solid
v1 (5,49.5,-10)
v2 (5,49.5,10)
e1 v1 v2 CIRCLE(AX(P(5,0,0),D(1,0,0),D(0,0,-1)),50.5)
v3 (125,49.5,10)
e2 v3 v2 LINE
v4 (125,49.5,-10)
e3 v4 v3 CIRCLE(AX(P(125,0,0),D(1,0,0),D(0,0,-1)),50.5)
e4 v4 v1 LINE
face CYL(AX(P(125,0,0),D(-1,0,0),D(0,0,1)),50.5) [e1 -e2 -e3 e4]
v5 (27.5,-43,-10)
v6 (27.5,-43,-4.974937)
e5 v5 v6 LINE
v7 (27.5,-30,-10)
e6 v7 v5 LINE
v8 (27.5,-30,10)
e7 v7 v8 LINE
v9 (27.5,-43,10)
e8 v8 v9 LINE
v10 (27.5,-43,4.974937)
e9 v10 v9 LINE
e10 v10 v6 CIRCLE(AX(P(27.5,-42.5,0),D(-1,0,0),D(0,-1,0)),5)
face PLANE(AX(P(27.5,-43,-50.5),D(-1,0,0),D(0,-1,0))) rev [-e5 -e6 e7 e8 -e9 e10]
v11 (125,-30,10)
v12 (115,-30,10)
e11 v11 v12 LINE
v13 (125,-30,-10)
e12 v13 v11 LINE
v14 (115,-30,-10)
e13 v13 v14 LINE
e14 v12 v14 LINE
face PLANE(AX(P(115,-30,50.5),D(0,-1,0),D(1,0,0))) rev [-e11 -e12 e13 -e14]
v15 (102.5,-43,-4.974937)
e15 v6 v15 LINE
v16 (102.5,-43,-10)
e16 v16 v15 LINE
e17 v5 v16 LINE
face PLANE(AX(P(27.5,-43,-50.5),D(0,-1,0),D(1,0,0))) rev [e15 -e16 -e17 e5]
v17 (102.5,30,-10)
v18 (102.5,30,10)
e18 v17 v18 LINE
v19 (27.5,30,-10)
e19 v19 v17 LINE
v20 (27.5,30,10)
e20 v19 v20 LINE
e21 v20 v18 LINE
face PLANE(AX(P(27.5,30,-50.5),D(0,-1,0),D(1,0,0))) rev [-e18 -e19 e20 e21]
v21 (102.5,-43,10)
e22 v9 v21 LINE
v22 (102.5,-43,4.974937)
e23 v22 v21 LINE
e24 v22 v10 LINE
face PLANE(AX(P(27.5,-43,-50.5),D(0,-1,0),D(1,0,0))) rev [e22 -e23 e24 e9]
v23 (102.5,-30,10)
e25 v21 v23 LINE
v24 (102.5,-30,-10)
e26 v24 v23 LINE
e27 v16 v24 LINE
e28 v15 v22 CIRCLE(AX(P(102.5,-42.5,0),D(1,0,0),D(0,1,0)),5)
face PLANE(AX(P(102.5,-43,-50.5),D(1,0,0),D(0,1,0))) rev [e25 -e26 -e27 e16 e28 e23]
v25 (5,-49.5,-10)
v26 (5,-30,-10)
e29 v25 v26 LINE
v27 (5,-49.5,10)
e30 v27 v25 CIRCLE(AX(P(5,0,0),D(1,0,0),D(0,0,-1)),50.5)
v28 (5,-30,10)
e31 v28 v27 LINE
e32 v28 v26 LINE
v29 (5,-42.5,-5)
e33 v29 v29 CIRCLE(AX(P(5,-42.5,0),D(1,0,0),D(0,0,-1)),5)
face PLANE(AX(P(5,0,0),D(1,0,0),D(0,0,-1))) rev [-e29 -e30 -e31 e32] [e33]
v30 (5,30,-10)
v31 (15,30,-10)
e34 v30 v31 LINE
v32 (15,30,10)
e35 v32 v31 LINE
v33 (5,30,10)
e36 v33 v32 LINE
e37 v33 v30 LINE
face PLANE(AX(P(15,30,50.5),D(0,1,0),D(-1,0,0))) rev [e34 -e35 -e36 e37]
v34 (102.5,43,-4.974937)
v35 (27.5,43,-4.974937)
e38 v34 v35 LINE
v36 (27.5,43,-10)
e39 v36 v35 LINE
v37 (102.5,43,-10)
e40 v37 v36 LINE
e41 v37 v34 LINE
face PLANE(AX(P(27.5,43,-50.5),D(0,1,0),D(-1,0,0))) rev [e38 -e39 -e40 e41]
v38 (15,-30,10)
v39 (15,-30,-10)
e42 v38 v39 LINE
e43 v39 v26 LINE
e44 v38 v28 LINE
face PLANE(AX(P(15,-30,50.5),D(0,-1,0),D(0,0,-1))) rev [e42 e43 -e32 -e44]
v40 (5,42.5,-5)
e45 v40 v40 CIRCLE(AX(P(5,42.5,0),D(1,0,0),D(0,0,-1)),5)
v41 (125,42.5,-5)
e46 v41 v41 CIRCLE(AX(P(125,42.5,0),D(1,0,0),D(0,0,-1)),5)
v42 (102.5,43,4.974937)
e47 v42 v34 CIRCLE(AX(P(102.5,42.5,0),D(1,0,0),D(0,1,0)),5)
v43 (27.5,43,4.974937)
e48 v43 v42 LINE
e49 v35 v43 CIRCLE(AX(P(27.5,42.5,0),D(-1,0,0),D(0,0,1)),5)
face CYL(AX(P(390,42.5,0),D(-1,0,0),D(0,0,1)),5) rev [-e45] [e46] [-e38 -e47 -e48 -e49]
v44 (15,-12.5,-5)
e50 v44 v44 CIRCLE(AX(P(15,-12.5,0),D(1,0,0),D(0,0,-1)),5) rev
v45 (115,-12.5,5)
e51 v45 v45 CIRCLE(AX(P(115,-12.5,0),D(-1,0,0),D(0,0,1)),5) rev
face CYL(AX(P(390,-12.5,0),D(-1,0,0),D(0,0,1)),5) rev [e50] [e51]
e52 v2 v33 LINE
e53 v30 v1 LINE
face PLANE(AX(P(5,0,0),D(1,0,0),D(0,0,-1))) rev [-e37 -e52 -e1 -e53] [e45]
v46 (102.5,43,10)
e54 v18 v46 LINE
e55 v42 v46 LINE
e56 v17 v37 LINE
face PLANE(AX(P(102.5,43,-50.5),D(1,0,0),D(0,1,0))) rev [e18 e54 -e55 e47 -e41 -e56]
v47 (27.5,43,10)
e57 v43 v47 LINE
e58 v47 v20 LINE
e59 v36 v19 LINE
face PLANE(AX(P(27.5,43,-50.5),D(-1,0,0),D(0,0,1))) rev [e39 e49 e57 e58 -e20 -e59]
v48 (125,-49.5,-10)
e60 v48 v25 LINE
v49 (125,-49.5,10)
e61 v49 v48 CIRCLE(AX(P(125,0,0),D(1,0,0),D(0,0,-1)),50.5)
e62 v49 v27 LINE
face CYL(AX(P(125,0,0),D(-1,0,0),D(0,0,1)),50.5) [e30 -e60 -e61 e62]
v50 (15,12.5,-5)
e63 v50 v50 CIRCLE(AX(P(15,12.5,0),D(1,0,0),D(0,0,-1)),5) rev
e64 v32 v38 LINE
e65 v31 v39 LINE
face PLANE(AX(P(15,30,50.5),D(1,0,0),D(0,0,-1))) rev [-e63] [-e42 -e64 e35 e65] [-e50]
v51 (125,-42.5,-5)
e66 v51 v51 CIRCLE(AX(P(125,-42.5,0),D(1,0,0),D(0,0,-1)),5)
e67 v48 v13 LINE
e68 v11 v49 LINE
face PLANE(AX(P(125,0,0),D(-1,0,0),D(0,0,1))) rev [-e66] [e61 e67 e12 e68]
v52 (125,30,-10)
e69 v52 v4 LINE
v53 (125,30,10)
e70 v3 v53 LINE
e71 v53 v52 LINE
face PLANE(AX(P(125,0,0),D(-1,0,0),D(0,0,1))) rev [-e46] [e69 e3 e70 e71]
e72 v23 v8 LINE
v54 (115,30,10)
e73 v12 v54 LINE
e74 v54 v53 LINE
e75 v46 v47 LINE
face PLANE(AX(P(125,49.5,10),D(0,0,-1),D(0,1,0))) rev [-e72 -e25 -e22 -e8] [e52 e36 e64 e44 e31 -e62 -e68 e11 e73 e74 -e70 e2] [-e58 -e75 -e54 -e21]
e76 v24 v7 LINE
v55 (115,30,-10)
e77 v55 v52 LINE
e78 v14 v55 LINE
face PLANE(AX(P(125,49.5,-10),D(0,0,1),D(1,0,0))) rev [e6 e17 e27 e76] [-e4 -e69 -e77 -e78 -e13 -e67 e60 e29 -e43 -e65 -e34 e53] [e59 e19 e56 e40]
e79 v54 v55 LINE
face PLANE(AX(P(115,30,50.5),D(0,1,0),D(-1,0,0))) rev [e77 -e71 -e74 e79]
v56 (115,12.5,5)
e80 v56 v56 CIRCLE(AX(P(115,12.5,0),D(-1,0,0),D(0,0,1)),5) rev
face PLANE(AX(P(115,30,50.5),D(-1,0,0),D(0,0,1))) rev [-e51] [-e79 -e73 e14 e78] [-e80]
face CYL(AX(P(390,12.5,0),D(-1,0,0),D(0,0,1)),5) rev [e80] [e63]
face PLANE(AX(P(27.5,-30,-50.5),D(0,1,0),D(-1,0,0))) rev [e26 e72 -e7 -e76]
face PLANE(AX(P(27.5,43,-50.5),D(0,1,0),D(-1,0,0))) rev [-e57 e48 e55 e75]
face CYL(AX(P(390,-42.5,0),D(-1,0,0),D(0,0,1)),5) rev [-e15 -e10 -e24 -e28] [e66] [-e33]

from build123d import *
from OCP.BRepFilletAPI import BRepFilletAPI_MakeChamfer

# Parameters (mm, degrees)
BOSS_EXTRUDE1_DEPTH = 125
SKETCH2_R           = 50.5
BOSS_EXTRUDE2_DEPTH = 5
SKETCH3_W           = 10
SKETCH3_H           = 60
CUT_EXTRUDE1_DEPTH  = 148.76839987
SKETCH7_W           = 62
SKETCH7_H           = 52
CUT_EXTRUDE3_DEPTH  = 5
SKETCH8_R           = 50.5
SKETCH8_W           = 62
SKETCH8_H           = 69
BOSS_EXTRUDE4_DEPTH = 140
CUT_EXTRUDE14_REACH = 159.164
SKETCH22_W          = 10
SKETCH22_H          = 25
BOSS_EXTRUDE5_DEPTH = 125
SKETCH11_W          = 140
SKETCH11_H          = 60
CUT_EXTRUDE5_DEPTH  = 397.485182573
CHAMFER2_SIZE       = 5
CHAMFER2_SIZE2      = 1.819851171
SKETCH9_R           = 5
CUT_EXTRUDE4_DEPTH  = 397.485182573
CUT_EXTRUDE6_REACH  = 399.883
SKETCH12_W          = 10
SKETCH12_H          = 60
SKETCH14_R          = 5
CUT_EXTRUDE8_DEPTH  = 397.485182573
SKETCH15_W          = 75
SKETCH15_H          = 13
CUT_EXTRUDE9_DEPTH  = 398.88252035
SKETCH17_R          = 50.5
SKETCH17_R_2        = 5
BOSS_EXTRUDE6_DEPTH = 5
CUT_EXTRUDE11_REACH = 403.404
SKETCH18_W          = 48
SKETCH18_H          = 35
SKETCH19_W          = 20
SKETCH19_H          = 20
BOSS_EXTRUDE7_DEPTH = 26
SKETCH20_W          = 23.5
SKETCH20_H          = 12.5
CUT_EXTRUDE12_DEPTH = 16
CHAMFER1_SIZE       = 4
SKETCH24_R          = 6
CUT_EXTRUDE16_DEPTH = 5
CUT_EXTRUDE13_REACH = 402.912
SKETCH21_W          = 7
SKETCH21_H          = 7
CUT_EXTRUDE15_REACH = 432.687
SKETCH23_W          = 1.5
SKETCH23_H          = 5
SKETCH16_W          = 221.910412248
SKETCH16_H          = 202.335986628
CUT_EXTRUDE10_DEPTH = 296
SKETCH25_W          = 135.205067632
SKETCH25_H          = 113.328081158
CUT_EXTRUDE17_DEPTH = 5


with BuildPart() as part:
    # Sketch1 → Boss-Extrude1 (new body)
    with BuildSketch(Plane(origin=(0, 0, 0), x_dir=(0, 0, -1), z_dir=(1, 0, 0))):
        with BuildLine():
            Line((-10, 49.5), (-10, -49.5))
            ThreePointArc((-10, -49.5), (0, -50.5), (10, -49.5))
            Line((10, -49.5), (10, 49.5))
            ThreePointArc((10, 49.5), (0, 50.5), (-10, 49.5))
        make_face()
    extrude(amount=BOSS_EXTRUDE1_DEPTH)

    # Sketch2 → Boss-Extrude2 (add)
    with BuildSketch(Plane(origin=(0, 0, 0), x_dir=(0, 0, -1), z_dir=(1, 0, 0))):
        with Locations(Location((0, 0, 0), (0, 0, 101.421186275))):
            Circle(SKETCH2_R)
    extrude(amount=BOSS_EXTRUDE2_DEPTH)

    # Sketch3 → Cut-Extrude1 (cut, through all)
    with BuildSketch(Plane(origin=(0, 0, -10), x_dir=(-1, 0, 0), z_dir=(0, 0, -1))):
        with Locations((-10, 0)):
            Rectangle(SKETCH3_W, SKETCH3_H)
        with Locations((-120, 0)):
            Rectangle(SKETCH3_W, SKETCH3_H)
    extrude(amount=-CUT_EXTRUDE1_DEPTH, mode=Mode.SUBTRACT)

    # Sketch7 → Cut-Extrude3 (cut)
    with BuildSketch(Plane.ZY):
        Rectangle(SKETCH7_W, SKETCH7_H)
    extrude(amount=-CUT_EXTRUDE3_DEPTH, mode=Mode.SUBTRACT)

    # Sketch8 → Boss-Extrude4 (add)
    with BuildSketch(Plane(origin=(125, 0, 0), x_dir=(0, 0, -1), z_dir=(1, 0, 0))):
        Circle(SKETCH8_R)
        with Locations((1.649655435, 0)):
            Rectangle(SKETCH8_W, SKETCH8_H, mode=Mode.SUBTRACT)
    extrude(amount=BOSS_EXTRUDE4_DEPTH)

    # Sketch22 → Cut-Extrude14 (cut, up to next)
    with BuildSketch(Plane.ZY.offset(-125), mode=Mode.PRIVATE) as cut_extrude14_sk1:
        with Locations((-45.5, 0)):
            Rectangle(SKETCH22_W, SKETCH22_H)
    cut_extrude14_tool1 = extrude(cut_extrude14_sk1.sketch, amount=-CUT_EXTRUDE14_REACH, mode=Mode.PRIVATE) & part.part
    add(cut_extrude14_tool1.solids().sort_by_distance((125, 0, -45.5))[0], mode=Mode.SUBTRACT)

    # Sketch10 → Boss-Extrude5 (add)
    with BuildSketch(Plane(origin=(265, 0, 0), x_dir=(0, 0, -1), z_dir=(1, 0, 0))):
        with BuildLine():
            Line((-10, 49.5), (-10, -49.5))
            ThreePointArc((-10, -49.5), (0, -50.5), (10, -49.5))
            Line((10, -49.5), (10, 49.5))
            ThreePointArc((10, 49.5), (0, 50.5), (-10, 49.5))
        make_face()
    extrude(amount=BOSS_EXTRUDE5_DEPTH)

    # Sketch11 → Cut-Extrude5 (cut, through all)
    with BuildSketch(Plane.XY):
        with Locations((195, 0)):
            Rectangle(SKETCH11_W, SKETCH11_H)
    extrude(amount=CUT_EXTRUDE5_DEPTH, mode=Mode.SUBTRACT)

    # Chamfer2: one chamfer whose edges measure the first distance from different faces: ONE call of the kernel's chamfer builder (chamfer() names one face for all edges)
    chamfer2_edges_1 = [part.edges().sort_by_distance(p)[0] for p in [
        (195, 30, 29.350344565),
    ]]
    chamfer2_side_1 = [part.faces().sort_by_distance(p)[0] for p in [
        (195, 30, 34.98680688),
    ]]
    chamfer2_edges_2 = [part.edges().sort_by_distance(p)[0] for p in [
        (195, -30, 29.350344565),
    ]]
    chamfer2_side_2 = [part.faces().sort_by_distance(p)[0] for p in [
        (195, -30, 34.98680688),
    ]]
    chamfer2 = BRepFilletAPI_MakeChamfer(part.part.solid().wrapped)
    for e in chamfer2_edges_1:
        chamfer2.Add(CHAMFER2_SIZE, CHAMFER2_SIZE2, e.wrapped, chamfer2_side_1[0].wrapped)  # the first distance lies on this face
    for e in chamfer2_edges_2:
        chamfer2.Add(CHAMFER2_SIZE, CHAMFER2_SIZE2, e.wrapped, chamfer2_side_2[0].wrapped)  # the first distance lies on this face
    add(Compound.cast(chamfer2.Shape()), mode=Mode.REPLACE)

    # Sketch9 → Cut-Extrude4 (cut, through all)
    with BuildSketch(Plane(origin=(0, 0, 0), x_dir=(0, 0, -1), z_dir=(1, 0, 0))):
        with Locations((0, -42.5)):
            Circle(SKETCH9_R)
        with Locations(Location((0, 42.5, 0), (0, 0, 180))):
            Circle(SKETCH9_R)
    extrude(amount=CUT_EXTRUDE4_DEPTH, mode=Mode.SUBTRACT)

    # Sketch12 → Cut-Extrude6 (cut, up to next)
    with BuildSketch(Plane(origin=(0, 0, -10), x_dir=(-1, 0, 0), z_dir=(0, 0, -1)), mode=Mode.PRIVATE) as cut_extrude6_sk1:
        with Locations((-270, 0)):
            Rectangle(SKETCH12_W, SKETCH12_H)
    cut_extrude6_tool1 = extrude(cut_extrude6_sk1.sketch, amount=-CUT_EXTRUDE6_REACH, mode=Mode.PRIVATE) & part.part
    # Sketch12 → Cut-Extrude6 (cut, up to next)
    with BuildSketch(Plane(origin=(0, 0, -10), x_dir=(-1, 0, 0), z_dir=(0, 0, -1)), mode=Mode.PRIVATE) as cut_extrude6_sk2:
        with Locations((-385, 0)):
            Rectangle(SKETCH12_W, SKETCH12_H)
    cut_extrude6_tool2 = extrude(cut_extrude6_sk2.sketch, amount=-CUT_EXTRUDE6_REACH, mode=Mode.PRIVATE) & part.part
    add(cut_extrude6_tool1.solids().sort_by_distance((270, 0, -10))[0], mode=Mode.SUBTRACT)
    add(cut_extrude6_tool2.solids().sort_by_distance((385, 0, -10))[0], mode=Mode.SUBTRACT)

    # Sketch14 → Cut-Extrude8 (cut, through all)
    with BuildSketch(Plane(origin=(0, 0, 0), x_dir=(0, 0, -1), z_dir=(1, 0, 0))):
        with Locations(Location((0, 12.5, 0), (0, 0, 180))):
            Circle(SKETCH14_R)
        with Locations(Location((0, -12.5, 0), (0, 0, 180))):
            Circle(SKETCH14_R)
    extrude(amount=CUT_EXTRUDE8_DEPTH, mode=Mode.SUBTRACT)

    # Sketch15 → Cut-Extrude9 (cut, through all)
    with BuildSketch(Plane.XY.offset(10)):
        with Locations((65, 36.5)):
            Rectangle(SKETCH15_W, SKETCH15_H)
        with Locations((65, -36.5)):
            Rectangle(SKETCH15_W, SKETCH15_H)
    extrude(amount=-CUT_EXTRUDE9_DEPTH, mode=Mode.SUBTRACT)

    # Sketch17 → Boss-Extrude6 (add)
    with BuildSketch(Plane(origin=(390, 0, 0), x_dir=(0, 0, -1), z_dir=(1, 0, 0))):
        Circle(SKETCH17_R)
        with Locations(Location((0, 42.5, 0), (0, 0, 180))):
            Circle(SKETCH17_R_2, mode=Mode.SUBTRACT)
        with Locations((0, -42.5)):
            Circle(SKETCH17_R_2, mode=Mode.SUBTRACT)
    extrude(amount=BOSS_EXTRUDE6_DEPTH)

    # Sketch18 → Cut-Extrude11 (cut, up to next)
    with BuildSketch(Plane(origin=(395, 0, 0), x_dir=(0, 0, -1), z_dir=(1, 0, 0)), mode=Mode.PRIVATE) as cut_extrude11_sk1:
        with Locations((-1, 0)):
            Rectangle(SKETCH18_W, SKETCH18_H)
    cut_extrude11_tool1 = extrude(cut_extrude11_sk1.sketch, amount=-CUT_EXTRUDE11_REACH, mode=Mode.PRIVATE) & part.part
    add(cut_extrude11_tool1.solids().sort_by_distance((395, 0, 1))[0], mode=Mode.SUBTRACT)

    # Sketch19 → Boss-Extrude7 (add)
    with BuildSketch(Plane(origin=(395, 0, 0), x_dir=(0, 0, -1), z_dir=(1, 0, 0))):
        with Locations((-35, 0)):
            Rectangle(SKETCH19_W, SKETCH19_H)
    extrude(amount=BOSS_EXTRUDE7_DEPTH)

    # Sketch20 → Cut-Extrude12 (cut)
    with BuildSketch(Plane(origin=(0, 0, 25), x_dir=(-1, 0, 0), z_dir=(0, 0, -1))):
        with Locations((-406.25, 0)):
            Rectangle(SKETCH20_W, SKETCH20_H)
    extrude(amount=-CUT_EXTRUDE12_DEPTH, mode=Mode.SUBTRACT)

    # Chamfer1
    # the kernel refuses this chamfer: 4 mm, written as the material it adds along each edge
    with BuildSketch(Plane(origin=(395, -10, 45), x_dir=(-0.0274958766105822, 0, 0.999621916911297), z_dir=(0, 1, 0)), Plane(origin=(395, -10, 25), x_dir=(-0.02749587661058217, -0.9996219169112968, 0), z_dir=(0, 0, 1)), Plane(origin=(395, 10, 45), x_dir=(-0.02749587661058217, 0.9996219169112968, 0), z_dir=(0, 0, -1))) as chamfer1_piece_1:
        Polygon((CHAMFER1_SIZE * 0.999621916911, CHAMFER1_SIZE * 0.0274958766106), (-CHAMFER1_SIZE * 0.0274958766106, CHAMFER1_SIZE * 0.999621916911), (0, 0), align=None)
    extrude(amount=20)
    with BuildSketch(Plane(origin=(395, -20.286731952, 45), x_dir=(-0.0274958766105822, 0, 0.999621916911297), z_dir=(0, 1, 0))) as chamfer1_piece_2a_section:
        Polygon((CHAMFER1_SIZE * 0.999621916911, CHAMFER1_SIZE * 0.0274958766106), (-CHAMFER1_SIZE * 0.0274958766106, CHAMFER1_SIZE * 0.999621916911), (0, 0), align=None)
    chamfer1_piece_2a = extrude(amount=30.286731952, mode=Mode.PRIVATE)
    chamfer1_piece_2a = chamfer1_piece_2a & Plane(origin=(396.415521785, 0, 0), x_dir=(0, 0.98019801980198, -0.19801980198019895), z_dir=(-1, 0, 0)) * Cylinder(50.5, 77, mode=Mode.PRIVATE)
    chamfer1_piece_2a = split(chamfer1_piece_2a, bisect_by=Plane(origin=(396.415521785, -10, 46.13532123), z_dir=(0, -1, 0)), keep=Keep.TOP, mode=Mode.PRIVATE)
    with BuildSketch(Plane(origin=(395, -10, 25), x_dir=(-0.02749587661058217, -0.9996219169112968, 0), z_dir=(0, 0, 1))) as chamfer1_piece_2b_section:
        Polygon((CHAMFER1_SIZE * 0.999621916911, CHAMFER1_SIZE * 0.0274958766106), (-CHAMFER1_SIZE * 0.0274958766106, CHAMFER1_SIZE * 0.999621916911), (0, 0), align=None)
    chamfer1_piece_2b = extrude(amount=30.286731952, mode=Mode.PRIVATE)
    chamfer1_piece_2b = chamfer1_piece_2b & Plane(origin=(396.349637844, 0, 0), x_dir=(0, 0.98019801980198, -0.19801980198019895), z_dir=(-1, 0, 0)) * Cylinder(50.5, 77, mode=Mode.PRIVATE)
    chamfer1_piece_2b = split(chamfer1_piece_2b, bisect_by=Plane(origin=(396.349637844, -11.262058297, 45), z_dir=(0, 0, 1)), keep=Keep.TOP, mode=Mode.PRIVATE)
    chamfer1_piece_2 = chamfer1_piece_2a & chamfer1_piece_2b
    add(chamfer1_piece_2)
    with BuildSketch(Plane(origin=(395, 10, 55.286731952), x_dir=(-0.02749587661058217, 0.9996219169112968, 0), z_dir=(0, 0, -1))) as chamfer1_piece_3a_section:
        Polygon((CHAMFER1_SIZE * 0.999621916911, CHAMFER1_SIZE * 0.0274958766106), (-CHAMFER1_SIZE * 0.0274958766106, CHAMFER1_SIZE * 0.999621916911), (0, 0), align=None)
    chamfer1_piece_3a = extrude(amount=30.286731952, mode=Mode.PRIVATE)
    chamfer1_piece_3a = chamfer1_piece_3a & Plane(origin=(396.349637844, 0, 0), x_dir=(0, 0.98019801980198, -0.19801980198019895), z_dir=(-1, 0, 0)) * Cylinder(50.5, 77, mode=Mode.PRIVATE)
    chamfer1_piece_3a = split(chamfer1_piece_3a, bisect_by=Plane(origin=(396.349637844, 11.262058297, 45), z_dir=(0, 0, 1)), keep=Keep.TOP, mode=Mode.PRIVATE)
    with BuildSketch(Plane(origin=(395, -10, 45), x_dir=(-0.0274958766105822, 0, 0.999621916911297), z_dir=(0, 1, 0))) as chamfer1_piece_3b_section:
        Polygon((CHAMFER1_SIZE * 0.999621916911, CHAMFER1_SIZE * 0.0274958766106), (-CHAMFER1_SIZE * 0.0274958766106, CHAMFER1_SIZE * 0.999621916911), (0, 0), align=None)
    chamfer1_piece_3b = extrude(amount=30.286731952, mode=Mode.PRIVATE)
    chamfer1_piece_3b = chamfer1_piece_3b & Plane(origin=(396.415521777, 0, 0), x_dir=(0, 0.98019801980198, -0.19801980198019895), z_dir=(-1, 0, 0)) * Cylinder(50.5, 77, mode=Mode.PRIVATE)
    chamfer1_piece_3b = split(chamfer1_piece_3b, bisect_by=Plane(origin=(396.415521777, 10, 46.135321233), z_dir=(0, 1, 0)), keep=Keep.TOP, mode=Mode.PRIVATE)
    chamfer1_piece_3 = chamfer1_piece_3a & chamfer1_piece_3b
    add(chamfer1_piece_3)
    # the kernel refuses this chamfer: 4 mm, written as the material it takes off along each edge
    with BuildSketch(Plane(origin=(421, -20.286731952, 45), x_dir=(0.0274958766105822, 0, -0.999621916911297), z_dir=(0, 1, 0)), Plane(origin=(421, 10, 55.286731952), x_dir=(0.027495876610582174, -0.9996219169112968, 0), z_dir=(0, 0, -1))) as chamfer1_2_piece_1:
        Polygon((CHAMFER1_SIZE * 0.999621916911, CHAMFER1_SIZE * 0.0274958766106), (-CHAMFER1_SIZE * 0.0274958766106, CHAMFER1_SIZE * 0.999621916911), (0, 0), align=None)
    extrude(amount=40.573463904, mode=Mode.SUBTRACT)
    with BuildSketch(Plane(origin=(421, -10, 14.713268048), x_dir=(-0.9996219169112968, -0.027495876610586605, 0), z_dir=(0, 0, 1))) as chamfer1_2_piece_2:
        Polygon((CHAMFER1_SIZE * 0.999621916911, -CHAMFER1_SIZE * 0.0274958766106), (-CHAMFER1_SIZE * 0.0274958766106, -CHAMFER1_SIZE * 0.999621916911), (0, 0), align=None)
    extrude(amount=40.573463904, mode=Mode.SUBTRACT)

    # Sketch24 → Cut-Extrude16 (cut)
    with BuildSketch(Plane.ZY):
        with Locations((-17, 37)):
            Circle(SKETCH24_R)
        with Locations(Location((17, 37, 0), (0, 0, 180))):
            Circle(SKETCH24_R)
        with Locations((17, -37)):
            Circle(SKETCH24_R)
        with Locations(Location((-17, -37, 0), (0, 0, 180))):
            Circle(SKETCH24_R)
    extrude(amount=-CUT_EXTRUDE16_DEPTH, mode=Mode.SUBTRACT)

    # Sketch21 → Cut-Extrude13 (cut, up to next)
    with BuildSketch(Plane(origin=(394.5, 0, 0), x_dir=(0, 0, -1), z_dir=(1, 0, 0)), mode=Mode.PRIVATE) as cut_extrude13_sk1:
        with Locations((-35.5, 0)):
            Rectangle(SKETCH21_W, SKETCH21_H)
    cut_extrude13_tool1 = extrude(cut_extrude13_sk1.sketch, amount=-CUT_EXTRUDE13_REACH, mode=Mode.PRIVATE) & part.part
    add(cut_extrude13_tool1.solids().sort_by_distance((394.5, 0, 35.5))[0], mode=Mode.SUBTRACT)

    # Sketch23 → Cut-Extrude15 (cut, up to next)
    with BuildSketch(Plane(origin=(0, 0, 25), x_dir=(-1, 0, 0), z_dir=(0, 0, -1)), mode=Mode.PRIVATE) as cut_extrude15_sk1:
        with Locations((-393.75, 0)):
            Rectangle(SKETCH23_W, SKETCH23_H)
    cut_extrude15_tool1 = extrude(cut_extrude15_sk1.sketch, amount=-CUT_EXTRUDE15_REACH, mode=Mode.PRIVATE) & part.part
    add(cut_extrude15_tool1.solids().sort_by_distance((393.75, 0, 25))[0], mode=Mode.SUBTRACT)

    # Sketch16 → Cut-Extrude10 (cut)
    with BuildSketch(Plane(origin=(421, 0, 0), x_dir=(0, 0, -1), z_dir=(1, 0, 0))):
        with Locations((18.111140578, -10.36995741)):
            Rectangle(SKETCH16_W, SKETCH16_H)
    extrude(amount=-CUT_EXTRUDE10_DEPTH, mode=Mode.SUBTRACT)

    # Sketch25 → Cut-Extrude17 (cut)
    with BuildSketch(Plane.ZY):
        Rectangle(SKETCH25_W, SKETCH25_H)
    extrude(amount=-CUT_EXTRUDE17_DEPTH, mode=Mode.SUBTRACT)


solid = part.part
